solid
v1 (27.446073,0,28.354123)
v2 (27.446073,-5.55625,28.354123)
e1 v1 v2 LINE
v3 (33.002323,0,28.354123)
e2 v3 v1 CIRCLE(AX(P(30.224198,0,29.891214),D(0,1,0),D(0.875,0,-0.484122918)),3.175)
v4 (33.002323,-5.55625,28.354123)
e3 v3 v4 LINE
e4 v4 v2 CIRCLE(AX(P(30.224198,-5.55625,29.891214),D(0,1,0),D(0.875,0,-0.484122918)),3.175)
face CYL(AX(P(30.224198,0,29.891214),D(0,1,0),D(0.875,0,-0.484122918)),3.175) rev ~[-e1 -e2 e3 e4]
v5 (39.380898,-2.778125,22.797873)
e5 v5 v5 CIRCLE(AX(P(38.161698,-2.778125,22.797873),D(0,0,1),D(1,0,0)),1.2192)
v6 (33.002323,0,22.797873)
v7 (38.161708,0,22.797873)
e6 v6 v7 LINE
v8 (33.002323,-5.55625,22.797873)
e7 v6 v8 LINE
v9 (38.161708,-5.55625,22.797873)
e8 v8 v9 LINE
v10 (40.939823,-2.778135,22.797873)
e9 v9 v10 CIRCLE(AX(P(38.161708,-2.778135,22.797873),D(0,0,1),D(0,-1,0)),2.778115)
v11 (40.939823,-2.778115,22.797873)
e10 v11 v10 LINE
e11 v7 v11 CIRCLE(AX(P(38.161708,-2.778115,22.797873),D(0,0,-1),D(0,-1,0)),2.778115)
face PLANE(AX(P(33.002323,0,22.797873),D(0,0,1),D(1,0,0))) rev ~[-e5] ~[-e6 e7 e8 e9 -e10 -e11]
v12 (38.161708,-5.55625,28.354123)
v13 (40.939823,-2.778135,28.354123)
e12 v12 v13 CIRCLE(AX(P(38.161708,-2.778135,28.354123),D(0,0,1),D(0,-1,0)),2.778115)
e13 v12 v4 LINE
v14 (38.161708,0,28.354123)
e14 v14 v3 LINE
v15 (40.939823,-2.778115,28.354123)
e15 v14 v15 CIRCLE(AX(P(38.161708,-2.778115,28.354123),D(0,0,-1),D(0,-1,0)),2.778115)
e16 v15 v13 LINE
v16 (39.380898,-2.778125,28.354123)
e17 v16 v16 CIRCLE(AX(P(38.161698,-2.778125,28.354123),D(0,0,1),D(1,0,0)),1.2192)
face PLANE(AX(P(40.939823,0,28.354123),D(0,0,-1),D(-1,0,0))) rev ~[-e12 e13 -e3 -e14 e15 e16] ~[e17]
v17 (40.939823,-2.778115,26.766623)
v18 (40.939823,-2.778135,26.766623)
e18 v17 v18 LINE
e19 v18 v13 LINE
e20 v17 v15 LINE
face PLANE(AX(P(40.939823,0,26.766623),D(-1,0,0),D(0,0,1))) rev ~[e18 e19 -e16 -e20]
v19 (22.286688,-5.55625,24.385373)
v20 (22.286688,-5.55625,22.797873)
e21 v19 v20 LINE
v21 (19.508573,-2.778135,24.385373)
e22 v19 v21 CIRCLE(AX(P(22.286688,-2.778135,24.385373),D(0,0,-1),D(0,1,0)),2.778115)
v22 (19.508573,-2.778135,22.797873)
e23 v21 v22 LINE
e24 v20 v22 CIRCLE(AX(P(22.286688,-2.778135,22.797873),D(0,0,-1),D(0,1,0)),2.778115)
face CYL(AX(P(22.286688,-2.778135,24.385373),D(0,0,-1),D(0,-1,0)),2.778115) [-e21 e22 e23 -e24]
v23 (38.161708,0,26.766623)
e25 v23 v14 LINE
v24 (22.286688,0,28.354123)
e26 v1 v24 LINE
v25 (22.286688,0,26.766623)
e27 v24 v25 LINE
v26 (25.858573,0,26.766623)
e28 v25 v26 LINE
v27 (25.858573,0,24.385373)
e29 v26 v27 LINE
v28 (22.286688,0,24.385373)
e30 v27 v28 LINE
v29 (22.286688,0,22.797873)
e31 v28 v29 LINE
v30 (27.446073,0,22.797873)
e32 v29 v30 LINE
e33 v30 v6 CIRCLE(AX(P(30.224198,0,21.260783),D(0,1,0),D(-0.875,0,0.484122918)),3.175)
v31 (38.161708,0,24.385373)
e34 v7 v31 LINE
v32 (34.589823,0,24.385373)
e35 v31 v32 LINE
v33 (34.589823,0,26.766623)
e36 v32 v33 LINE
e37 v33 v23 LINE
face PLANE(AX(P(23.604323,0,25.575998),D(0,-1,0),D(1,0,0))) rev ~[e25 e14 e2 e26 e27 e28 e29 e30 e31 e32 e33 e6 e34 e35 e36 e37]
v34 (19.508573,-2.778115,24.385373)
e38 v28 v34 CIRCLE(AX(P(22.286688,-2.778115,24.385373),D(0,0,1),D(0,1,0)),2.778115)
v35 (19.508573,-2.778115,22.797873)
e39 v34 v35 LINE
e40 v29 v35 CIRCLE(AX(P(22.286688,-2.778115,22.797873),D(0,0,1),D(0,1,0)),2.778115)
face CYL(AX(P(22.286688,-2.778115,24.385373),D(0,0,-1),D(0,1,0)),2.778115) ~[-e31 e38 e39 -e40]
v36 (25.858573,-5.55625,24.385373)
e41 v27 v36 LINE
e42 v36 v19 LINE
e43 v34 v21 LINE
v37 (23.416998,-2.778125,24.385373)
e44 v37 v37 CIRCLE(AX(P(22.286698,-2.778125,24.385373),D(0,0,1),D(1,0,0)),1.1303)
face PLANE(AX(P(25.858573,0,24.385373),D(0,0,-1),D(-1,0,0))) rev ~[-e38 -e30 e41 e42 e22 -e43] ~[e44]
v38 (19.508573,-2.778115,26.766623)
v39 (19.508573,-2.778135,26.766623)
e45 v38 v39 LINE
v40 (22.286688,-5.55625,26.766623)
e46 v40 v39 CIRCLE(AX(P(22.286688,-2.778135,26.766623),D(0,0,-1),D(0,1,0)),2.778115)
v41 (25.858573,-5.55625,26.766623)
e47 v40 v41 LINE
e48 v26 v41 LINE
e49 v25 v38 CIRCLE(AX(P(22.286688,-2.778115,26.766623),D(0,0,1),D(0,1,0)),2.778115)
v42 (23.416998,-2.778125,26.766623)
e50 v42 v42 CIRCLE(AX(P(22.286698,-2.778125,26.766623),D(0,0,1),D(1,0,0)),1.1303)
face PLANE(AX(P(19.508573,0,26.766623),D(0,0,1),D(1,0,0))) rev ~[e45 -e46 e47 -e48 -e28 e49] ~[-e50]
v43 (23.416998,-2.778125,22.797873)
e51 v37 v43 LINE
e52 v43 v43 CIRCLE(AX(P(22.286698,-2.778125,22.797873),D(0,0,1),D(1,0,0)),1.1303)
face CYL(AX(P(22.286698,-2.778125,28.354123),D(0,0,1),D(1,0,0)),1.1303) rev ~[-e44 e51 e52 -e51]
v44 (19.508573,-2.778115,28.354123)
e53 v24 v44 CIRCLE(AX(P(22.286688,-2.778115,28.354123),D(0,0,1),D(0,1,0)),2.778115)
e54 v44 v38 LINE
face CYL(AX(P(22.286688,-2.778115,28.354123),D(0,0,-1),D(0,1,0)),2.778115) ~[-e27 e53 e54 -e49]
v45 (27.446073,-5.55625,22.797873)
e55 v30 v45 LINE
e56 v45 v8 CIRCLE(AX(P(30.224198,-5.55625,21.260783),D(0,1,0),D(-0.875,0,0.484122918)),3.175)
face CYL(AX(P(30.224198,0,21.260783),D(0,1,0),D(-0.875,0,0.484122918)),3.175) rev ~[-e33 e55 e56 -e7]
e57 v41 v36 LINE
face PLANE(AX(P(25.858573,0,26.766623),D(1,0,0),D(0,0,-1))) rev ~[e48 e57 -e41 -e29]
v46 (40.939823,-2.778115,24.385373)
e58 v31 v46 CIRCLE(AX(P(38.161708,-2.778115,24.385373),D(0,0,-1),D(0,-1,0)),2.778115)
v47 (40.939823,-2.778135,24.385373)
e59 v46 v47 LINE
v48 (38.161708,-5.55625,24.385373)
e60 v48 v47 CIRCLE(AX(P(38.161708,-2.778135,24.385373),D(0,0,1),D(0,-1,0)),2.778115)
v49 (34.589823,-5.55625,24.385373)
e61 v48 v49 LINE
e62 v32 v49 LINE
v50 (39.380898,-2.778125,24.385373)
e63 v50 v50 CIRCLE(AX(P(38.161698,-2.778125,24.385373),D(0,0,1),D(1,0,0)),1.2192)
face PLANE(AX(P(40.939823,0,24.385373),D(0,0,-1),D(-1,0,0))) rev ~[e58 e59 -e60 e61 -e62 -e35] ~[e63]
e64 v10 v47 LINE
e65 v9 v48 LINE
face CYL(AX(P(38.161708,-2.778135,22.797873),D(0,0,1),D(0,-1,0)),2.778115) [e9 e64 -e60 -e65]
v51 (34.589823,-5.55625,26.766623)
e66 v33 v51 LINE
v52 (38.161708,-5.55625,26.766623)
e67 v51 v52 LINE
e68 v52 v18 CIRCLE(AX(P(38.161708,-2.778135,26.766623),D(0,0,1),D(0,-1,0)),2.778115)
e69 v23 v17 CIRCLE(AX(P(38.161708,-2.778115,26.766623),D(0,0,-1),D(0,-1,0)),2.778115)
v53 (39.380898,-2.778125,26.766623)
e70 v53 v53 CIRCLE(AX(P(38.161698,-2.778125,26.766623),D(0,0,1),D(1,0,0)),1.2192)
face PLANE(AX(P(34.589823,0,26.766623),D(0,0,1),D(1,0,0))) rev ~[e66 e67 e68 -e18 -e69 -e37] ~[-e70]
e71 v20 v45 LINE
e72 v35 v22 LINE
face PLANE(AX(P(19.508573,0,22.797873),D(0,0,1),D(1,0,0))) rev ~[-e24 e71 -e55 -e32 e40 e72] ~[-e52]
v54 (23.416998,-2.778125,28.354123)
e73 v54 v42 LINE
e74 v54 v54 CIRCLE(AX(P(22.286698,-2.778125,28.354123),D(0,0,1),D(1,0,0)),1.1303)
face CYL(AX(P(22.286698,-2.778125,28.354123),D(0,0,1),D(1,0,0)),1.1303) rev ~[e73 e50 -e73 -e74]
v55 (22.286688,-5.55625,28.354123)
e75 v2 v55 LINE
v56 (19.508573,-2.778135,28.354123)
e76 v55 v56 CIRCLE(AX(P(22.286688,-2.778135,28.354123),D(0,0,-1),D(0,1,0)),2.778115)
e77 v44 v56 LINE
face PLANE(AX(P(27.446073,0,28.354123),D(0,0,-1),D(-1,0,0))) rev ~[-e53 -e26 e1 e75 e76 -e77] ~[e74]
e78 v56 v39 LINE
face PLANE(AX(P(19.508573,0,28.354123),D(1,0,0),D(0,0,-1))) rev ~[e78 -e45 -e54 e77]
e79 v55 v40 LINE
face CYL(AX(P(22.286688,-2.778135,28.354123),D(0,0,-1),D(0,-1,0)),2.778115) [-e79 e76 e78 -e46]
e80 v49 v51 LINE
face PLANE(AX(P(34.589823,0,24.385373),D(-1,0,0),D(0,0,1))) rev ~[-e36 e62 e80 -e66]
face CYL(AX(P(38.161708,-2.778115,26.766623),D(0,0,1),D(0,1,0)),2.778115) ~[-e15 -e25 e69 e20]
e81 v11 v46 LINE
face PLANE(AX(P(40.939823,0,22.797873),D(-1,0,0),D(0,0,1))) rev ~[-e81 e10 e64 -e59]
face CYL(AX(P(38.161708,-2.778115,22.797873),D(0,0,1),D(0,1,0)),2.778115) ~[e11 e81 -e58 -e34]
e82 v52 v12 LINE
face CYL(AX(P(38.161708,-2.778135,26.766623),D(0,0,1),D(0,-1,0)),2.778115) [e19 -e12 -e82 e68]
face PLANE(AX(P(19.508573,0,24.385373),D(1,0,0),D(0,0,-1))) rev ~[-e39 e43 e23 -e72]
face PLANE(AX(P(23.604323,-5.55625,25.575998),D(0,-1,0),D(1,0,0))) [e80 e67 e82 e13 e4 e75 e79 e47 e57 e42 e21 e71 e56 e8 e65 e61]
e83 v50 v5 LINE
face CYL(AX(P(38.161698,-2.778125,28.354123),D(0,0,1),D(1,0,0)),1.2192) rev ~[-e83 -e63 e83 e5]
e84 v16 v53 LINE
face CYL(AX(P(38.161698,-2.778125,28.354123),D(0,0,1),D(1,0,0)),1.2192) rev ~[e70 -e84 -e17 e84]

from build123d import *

# Parameters (mm, degrees)
F1_DEPTH = 5.55625
F2_R     = 1.1303
F2_R_2   = 1.2192
F3_DEPTH = 25.4
F4_R     = 2.778115


# Not quite as in the source:
# - a fillet or chamfer is up to 0.001 mm smaller than in the source, because OpenCascade refuses the exact size


with BuildPart() as f1:
    # F0 (on Front) → F1 (new body)
    with BuildSketch(Plane.XZ):
        Polygon((27.4460728326, 28.3541232628), (19.5085728326, 28.3541232628), (19.5085728326, 26.7666232628), (25.8585728326, 26.7666232628), (25.8585728326, 24.3853732628), (19.5085728326, 24.3853732628), (19.5085728326, 22.7978732628), (27.4460728326, 22.7978732628), align=None)
        with BuildLine():
            ThreePointArc((33.0023228326, 28.3541232628), (30.2241978326, 26.7162135284), (27.4460728326, 28.3541232628))
            Line((27.4460728326, 28.3541232628), (27.4460728326, 22.7978732628))
            ThreePointArc((27.4460728326, 22.7978732628), (30.2241978326, 24.4357829973), (33.0023228326, 22.7978732628))
            Line((33.0023228326, 22.7978732628), (33.0023228326, 28.3541232628))
        make_face()
        Polygon((40.9398228326, 28.3541232628), (33.0023228326, 28.3541232628), (33.0023228326, 22.7978732628), (40.9398228326, 22.7978732628), (40.9398228326, 24.3853732628), (34.5898228326, 24.3853732628), (34.5898228326, 26.7666232628), (40.9398228326, 26.7666232628), align=None)
    extrude(amount=F1_DEPTH)

    # F2 (on face) → F3 (cut)
    with BuildSketch(Plane.XY.offset(28.3541232628)):
        with Locations((22.2866978326, -2.778125)):
            Circle(F2_R)
        with Locations((38.1616978326, -2.778125)):
            Circle(F2_R_2)
    extrude(amount=-F3_DEPTH, mode=Mode.SUBTRACT)

    # F4 (radius 2.778125 in the source; OpenCascade refuses exactly that, so slightly less here)
    f4_edges = [f1.edges().sort_by_distance(p)[0] for p in [
        (19.508573, 0, 23.591623),
        (19.508573, 0, 27.560373),
        (19.508573, -5.55625, 27.560373),
        (19.508573, -5.55625, 23.591623),
        (40.939823, 0, 23.591623),
        (40.939823, 0, 27.560373),
        (40.939823, -5.55625, 23.591623),
        (40.939823, -5.55625, 27.560373),
    ]]
    fillet(f4_edges, radius=F4_R)


solid = f1.part
